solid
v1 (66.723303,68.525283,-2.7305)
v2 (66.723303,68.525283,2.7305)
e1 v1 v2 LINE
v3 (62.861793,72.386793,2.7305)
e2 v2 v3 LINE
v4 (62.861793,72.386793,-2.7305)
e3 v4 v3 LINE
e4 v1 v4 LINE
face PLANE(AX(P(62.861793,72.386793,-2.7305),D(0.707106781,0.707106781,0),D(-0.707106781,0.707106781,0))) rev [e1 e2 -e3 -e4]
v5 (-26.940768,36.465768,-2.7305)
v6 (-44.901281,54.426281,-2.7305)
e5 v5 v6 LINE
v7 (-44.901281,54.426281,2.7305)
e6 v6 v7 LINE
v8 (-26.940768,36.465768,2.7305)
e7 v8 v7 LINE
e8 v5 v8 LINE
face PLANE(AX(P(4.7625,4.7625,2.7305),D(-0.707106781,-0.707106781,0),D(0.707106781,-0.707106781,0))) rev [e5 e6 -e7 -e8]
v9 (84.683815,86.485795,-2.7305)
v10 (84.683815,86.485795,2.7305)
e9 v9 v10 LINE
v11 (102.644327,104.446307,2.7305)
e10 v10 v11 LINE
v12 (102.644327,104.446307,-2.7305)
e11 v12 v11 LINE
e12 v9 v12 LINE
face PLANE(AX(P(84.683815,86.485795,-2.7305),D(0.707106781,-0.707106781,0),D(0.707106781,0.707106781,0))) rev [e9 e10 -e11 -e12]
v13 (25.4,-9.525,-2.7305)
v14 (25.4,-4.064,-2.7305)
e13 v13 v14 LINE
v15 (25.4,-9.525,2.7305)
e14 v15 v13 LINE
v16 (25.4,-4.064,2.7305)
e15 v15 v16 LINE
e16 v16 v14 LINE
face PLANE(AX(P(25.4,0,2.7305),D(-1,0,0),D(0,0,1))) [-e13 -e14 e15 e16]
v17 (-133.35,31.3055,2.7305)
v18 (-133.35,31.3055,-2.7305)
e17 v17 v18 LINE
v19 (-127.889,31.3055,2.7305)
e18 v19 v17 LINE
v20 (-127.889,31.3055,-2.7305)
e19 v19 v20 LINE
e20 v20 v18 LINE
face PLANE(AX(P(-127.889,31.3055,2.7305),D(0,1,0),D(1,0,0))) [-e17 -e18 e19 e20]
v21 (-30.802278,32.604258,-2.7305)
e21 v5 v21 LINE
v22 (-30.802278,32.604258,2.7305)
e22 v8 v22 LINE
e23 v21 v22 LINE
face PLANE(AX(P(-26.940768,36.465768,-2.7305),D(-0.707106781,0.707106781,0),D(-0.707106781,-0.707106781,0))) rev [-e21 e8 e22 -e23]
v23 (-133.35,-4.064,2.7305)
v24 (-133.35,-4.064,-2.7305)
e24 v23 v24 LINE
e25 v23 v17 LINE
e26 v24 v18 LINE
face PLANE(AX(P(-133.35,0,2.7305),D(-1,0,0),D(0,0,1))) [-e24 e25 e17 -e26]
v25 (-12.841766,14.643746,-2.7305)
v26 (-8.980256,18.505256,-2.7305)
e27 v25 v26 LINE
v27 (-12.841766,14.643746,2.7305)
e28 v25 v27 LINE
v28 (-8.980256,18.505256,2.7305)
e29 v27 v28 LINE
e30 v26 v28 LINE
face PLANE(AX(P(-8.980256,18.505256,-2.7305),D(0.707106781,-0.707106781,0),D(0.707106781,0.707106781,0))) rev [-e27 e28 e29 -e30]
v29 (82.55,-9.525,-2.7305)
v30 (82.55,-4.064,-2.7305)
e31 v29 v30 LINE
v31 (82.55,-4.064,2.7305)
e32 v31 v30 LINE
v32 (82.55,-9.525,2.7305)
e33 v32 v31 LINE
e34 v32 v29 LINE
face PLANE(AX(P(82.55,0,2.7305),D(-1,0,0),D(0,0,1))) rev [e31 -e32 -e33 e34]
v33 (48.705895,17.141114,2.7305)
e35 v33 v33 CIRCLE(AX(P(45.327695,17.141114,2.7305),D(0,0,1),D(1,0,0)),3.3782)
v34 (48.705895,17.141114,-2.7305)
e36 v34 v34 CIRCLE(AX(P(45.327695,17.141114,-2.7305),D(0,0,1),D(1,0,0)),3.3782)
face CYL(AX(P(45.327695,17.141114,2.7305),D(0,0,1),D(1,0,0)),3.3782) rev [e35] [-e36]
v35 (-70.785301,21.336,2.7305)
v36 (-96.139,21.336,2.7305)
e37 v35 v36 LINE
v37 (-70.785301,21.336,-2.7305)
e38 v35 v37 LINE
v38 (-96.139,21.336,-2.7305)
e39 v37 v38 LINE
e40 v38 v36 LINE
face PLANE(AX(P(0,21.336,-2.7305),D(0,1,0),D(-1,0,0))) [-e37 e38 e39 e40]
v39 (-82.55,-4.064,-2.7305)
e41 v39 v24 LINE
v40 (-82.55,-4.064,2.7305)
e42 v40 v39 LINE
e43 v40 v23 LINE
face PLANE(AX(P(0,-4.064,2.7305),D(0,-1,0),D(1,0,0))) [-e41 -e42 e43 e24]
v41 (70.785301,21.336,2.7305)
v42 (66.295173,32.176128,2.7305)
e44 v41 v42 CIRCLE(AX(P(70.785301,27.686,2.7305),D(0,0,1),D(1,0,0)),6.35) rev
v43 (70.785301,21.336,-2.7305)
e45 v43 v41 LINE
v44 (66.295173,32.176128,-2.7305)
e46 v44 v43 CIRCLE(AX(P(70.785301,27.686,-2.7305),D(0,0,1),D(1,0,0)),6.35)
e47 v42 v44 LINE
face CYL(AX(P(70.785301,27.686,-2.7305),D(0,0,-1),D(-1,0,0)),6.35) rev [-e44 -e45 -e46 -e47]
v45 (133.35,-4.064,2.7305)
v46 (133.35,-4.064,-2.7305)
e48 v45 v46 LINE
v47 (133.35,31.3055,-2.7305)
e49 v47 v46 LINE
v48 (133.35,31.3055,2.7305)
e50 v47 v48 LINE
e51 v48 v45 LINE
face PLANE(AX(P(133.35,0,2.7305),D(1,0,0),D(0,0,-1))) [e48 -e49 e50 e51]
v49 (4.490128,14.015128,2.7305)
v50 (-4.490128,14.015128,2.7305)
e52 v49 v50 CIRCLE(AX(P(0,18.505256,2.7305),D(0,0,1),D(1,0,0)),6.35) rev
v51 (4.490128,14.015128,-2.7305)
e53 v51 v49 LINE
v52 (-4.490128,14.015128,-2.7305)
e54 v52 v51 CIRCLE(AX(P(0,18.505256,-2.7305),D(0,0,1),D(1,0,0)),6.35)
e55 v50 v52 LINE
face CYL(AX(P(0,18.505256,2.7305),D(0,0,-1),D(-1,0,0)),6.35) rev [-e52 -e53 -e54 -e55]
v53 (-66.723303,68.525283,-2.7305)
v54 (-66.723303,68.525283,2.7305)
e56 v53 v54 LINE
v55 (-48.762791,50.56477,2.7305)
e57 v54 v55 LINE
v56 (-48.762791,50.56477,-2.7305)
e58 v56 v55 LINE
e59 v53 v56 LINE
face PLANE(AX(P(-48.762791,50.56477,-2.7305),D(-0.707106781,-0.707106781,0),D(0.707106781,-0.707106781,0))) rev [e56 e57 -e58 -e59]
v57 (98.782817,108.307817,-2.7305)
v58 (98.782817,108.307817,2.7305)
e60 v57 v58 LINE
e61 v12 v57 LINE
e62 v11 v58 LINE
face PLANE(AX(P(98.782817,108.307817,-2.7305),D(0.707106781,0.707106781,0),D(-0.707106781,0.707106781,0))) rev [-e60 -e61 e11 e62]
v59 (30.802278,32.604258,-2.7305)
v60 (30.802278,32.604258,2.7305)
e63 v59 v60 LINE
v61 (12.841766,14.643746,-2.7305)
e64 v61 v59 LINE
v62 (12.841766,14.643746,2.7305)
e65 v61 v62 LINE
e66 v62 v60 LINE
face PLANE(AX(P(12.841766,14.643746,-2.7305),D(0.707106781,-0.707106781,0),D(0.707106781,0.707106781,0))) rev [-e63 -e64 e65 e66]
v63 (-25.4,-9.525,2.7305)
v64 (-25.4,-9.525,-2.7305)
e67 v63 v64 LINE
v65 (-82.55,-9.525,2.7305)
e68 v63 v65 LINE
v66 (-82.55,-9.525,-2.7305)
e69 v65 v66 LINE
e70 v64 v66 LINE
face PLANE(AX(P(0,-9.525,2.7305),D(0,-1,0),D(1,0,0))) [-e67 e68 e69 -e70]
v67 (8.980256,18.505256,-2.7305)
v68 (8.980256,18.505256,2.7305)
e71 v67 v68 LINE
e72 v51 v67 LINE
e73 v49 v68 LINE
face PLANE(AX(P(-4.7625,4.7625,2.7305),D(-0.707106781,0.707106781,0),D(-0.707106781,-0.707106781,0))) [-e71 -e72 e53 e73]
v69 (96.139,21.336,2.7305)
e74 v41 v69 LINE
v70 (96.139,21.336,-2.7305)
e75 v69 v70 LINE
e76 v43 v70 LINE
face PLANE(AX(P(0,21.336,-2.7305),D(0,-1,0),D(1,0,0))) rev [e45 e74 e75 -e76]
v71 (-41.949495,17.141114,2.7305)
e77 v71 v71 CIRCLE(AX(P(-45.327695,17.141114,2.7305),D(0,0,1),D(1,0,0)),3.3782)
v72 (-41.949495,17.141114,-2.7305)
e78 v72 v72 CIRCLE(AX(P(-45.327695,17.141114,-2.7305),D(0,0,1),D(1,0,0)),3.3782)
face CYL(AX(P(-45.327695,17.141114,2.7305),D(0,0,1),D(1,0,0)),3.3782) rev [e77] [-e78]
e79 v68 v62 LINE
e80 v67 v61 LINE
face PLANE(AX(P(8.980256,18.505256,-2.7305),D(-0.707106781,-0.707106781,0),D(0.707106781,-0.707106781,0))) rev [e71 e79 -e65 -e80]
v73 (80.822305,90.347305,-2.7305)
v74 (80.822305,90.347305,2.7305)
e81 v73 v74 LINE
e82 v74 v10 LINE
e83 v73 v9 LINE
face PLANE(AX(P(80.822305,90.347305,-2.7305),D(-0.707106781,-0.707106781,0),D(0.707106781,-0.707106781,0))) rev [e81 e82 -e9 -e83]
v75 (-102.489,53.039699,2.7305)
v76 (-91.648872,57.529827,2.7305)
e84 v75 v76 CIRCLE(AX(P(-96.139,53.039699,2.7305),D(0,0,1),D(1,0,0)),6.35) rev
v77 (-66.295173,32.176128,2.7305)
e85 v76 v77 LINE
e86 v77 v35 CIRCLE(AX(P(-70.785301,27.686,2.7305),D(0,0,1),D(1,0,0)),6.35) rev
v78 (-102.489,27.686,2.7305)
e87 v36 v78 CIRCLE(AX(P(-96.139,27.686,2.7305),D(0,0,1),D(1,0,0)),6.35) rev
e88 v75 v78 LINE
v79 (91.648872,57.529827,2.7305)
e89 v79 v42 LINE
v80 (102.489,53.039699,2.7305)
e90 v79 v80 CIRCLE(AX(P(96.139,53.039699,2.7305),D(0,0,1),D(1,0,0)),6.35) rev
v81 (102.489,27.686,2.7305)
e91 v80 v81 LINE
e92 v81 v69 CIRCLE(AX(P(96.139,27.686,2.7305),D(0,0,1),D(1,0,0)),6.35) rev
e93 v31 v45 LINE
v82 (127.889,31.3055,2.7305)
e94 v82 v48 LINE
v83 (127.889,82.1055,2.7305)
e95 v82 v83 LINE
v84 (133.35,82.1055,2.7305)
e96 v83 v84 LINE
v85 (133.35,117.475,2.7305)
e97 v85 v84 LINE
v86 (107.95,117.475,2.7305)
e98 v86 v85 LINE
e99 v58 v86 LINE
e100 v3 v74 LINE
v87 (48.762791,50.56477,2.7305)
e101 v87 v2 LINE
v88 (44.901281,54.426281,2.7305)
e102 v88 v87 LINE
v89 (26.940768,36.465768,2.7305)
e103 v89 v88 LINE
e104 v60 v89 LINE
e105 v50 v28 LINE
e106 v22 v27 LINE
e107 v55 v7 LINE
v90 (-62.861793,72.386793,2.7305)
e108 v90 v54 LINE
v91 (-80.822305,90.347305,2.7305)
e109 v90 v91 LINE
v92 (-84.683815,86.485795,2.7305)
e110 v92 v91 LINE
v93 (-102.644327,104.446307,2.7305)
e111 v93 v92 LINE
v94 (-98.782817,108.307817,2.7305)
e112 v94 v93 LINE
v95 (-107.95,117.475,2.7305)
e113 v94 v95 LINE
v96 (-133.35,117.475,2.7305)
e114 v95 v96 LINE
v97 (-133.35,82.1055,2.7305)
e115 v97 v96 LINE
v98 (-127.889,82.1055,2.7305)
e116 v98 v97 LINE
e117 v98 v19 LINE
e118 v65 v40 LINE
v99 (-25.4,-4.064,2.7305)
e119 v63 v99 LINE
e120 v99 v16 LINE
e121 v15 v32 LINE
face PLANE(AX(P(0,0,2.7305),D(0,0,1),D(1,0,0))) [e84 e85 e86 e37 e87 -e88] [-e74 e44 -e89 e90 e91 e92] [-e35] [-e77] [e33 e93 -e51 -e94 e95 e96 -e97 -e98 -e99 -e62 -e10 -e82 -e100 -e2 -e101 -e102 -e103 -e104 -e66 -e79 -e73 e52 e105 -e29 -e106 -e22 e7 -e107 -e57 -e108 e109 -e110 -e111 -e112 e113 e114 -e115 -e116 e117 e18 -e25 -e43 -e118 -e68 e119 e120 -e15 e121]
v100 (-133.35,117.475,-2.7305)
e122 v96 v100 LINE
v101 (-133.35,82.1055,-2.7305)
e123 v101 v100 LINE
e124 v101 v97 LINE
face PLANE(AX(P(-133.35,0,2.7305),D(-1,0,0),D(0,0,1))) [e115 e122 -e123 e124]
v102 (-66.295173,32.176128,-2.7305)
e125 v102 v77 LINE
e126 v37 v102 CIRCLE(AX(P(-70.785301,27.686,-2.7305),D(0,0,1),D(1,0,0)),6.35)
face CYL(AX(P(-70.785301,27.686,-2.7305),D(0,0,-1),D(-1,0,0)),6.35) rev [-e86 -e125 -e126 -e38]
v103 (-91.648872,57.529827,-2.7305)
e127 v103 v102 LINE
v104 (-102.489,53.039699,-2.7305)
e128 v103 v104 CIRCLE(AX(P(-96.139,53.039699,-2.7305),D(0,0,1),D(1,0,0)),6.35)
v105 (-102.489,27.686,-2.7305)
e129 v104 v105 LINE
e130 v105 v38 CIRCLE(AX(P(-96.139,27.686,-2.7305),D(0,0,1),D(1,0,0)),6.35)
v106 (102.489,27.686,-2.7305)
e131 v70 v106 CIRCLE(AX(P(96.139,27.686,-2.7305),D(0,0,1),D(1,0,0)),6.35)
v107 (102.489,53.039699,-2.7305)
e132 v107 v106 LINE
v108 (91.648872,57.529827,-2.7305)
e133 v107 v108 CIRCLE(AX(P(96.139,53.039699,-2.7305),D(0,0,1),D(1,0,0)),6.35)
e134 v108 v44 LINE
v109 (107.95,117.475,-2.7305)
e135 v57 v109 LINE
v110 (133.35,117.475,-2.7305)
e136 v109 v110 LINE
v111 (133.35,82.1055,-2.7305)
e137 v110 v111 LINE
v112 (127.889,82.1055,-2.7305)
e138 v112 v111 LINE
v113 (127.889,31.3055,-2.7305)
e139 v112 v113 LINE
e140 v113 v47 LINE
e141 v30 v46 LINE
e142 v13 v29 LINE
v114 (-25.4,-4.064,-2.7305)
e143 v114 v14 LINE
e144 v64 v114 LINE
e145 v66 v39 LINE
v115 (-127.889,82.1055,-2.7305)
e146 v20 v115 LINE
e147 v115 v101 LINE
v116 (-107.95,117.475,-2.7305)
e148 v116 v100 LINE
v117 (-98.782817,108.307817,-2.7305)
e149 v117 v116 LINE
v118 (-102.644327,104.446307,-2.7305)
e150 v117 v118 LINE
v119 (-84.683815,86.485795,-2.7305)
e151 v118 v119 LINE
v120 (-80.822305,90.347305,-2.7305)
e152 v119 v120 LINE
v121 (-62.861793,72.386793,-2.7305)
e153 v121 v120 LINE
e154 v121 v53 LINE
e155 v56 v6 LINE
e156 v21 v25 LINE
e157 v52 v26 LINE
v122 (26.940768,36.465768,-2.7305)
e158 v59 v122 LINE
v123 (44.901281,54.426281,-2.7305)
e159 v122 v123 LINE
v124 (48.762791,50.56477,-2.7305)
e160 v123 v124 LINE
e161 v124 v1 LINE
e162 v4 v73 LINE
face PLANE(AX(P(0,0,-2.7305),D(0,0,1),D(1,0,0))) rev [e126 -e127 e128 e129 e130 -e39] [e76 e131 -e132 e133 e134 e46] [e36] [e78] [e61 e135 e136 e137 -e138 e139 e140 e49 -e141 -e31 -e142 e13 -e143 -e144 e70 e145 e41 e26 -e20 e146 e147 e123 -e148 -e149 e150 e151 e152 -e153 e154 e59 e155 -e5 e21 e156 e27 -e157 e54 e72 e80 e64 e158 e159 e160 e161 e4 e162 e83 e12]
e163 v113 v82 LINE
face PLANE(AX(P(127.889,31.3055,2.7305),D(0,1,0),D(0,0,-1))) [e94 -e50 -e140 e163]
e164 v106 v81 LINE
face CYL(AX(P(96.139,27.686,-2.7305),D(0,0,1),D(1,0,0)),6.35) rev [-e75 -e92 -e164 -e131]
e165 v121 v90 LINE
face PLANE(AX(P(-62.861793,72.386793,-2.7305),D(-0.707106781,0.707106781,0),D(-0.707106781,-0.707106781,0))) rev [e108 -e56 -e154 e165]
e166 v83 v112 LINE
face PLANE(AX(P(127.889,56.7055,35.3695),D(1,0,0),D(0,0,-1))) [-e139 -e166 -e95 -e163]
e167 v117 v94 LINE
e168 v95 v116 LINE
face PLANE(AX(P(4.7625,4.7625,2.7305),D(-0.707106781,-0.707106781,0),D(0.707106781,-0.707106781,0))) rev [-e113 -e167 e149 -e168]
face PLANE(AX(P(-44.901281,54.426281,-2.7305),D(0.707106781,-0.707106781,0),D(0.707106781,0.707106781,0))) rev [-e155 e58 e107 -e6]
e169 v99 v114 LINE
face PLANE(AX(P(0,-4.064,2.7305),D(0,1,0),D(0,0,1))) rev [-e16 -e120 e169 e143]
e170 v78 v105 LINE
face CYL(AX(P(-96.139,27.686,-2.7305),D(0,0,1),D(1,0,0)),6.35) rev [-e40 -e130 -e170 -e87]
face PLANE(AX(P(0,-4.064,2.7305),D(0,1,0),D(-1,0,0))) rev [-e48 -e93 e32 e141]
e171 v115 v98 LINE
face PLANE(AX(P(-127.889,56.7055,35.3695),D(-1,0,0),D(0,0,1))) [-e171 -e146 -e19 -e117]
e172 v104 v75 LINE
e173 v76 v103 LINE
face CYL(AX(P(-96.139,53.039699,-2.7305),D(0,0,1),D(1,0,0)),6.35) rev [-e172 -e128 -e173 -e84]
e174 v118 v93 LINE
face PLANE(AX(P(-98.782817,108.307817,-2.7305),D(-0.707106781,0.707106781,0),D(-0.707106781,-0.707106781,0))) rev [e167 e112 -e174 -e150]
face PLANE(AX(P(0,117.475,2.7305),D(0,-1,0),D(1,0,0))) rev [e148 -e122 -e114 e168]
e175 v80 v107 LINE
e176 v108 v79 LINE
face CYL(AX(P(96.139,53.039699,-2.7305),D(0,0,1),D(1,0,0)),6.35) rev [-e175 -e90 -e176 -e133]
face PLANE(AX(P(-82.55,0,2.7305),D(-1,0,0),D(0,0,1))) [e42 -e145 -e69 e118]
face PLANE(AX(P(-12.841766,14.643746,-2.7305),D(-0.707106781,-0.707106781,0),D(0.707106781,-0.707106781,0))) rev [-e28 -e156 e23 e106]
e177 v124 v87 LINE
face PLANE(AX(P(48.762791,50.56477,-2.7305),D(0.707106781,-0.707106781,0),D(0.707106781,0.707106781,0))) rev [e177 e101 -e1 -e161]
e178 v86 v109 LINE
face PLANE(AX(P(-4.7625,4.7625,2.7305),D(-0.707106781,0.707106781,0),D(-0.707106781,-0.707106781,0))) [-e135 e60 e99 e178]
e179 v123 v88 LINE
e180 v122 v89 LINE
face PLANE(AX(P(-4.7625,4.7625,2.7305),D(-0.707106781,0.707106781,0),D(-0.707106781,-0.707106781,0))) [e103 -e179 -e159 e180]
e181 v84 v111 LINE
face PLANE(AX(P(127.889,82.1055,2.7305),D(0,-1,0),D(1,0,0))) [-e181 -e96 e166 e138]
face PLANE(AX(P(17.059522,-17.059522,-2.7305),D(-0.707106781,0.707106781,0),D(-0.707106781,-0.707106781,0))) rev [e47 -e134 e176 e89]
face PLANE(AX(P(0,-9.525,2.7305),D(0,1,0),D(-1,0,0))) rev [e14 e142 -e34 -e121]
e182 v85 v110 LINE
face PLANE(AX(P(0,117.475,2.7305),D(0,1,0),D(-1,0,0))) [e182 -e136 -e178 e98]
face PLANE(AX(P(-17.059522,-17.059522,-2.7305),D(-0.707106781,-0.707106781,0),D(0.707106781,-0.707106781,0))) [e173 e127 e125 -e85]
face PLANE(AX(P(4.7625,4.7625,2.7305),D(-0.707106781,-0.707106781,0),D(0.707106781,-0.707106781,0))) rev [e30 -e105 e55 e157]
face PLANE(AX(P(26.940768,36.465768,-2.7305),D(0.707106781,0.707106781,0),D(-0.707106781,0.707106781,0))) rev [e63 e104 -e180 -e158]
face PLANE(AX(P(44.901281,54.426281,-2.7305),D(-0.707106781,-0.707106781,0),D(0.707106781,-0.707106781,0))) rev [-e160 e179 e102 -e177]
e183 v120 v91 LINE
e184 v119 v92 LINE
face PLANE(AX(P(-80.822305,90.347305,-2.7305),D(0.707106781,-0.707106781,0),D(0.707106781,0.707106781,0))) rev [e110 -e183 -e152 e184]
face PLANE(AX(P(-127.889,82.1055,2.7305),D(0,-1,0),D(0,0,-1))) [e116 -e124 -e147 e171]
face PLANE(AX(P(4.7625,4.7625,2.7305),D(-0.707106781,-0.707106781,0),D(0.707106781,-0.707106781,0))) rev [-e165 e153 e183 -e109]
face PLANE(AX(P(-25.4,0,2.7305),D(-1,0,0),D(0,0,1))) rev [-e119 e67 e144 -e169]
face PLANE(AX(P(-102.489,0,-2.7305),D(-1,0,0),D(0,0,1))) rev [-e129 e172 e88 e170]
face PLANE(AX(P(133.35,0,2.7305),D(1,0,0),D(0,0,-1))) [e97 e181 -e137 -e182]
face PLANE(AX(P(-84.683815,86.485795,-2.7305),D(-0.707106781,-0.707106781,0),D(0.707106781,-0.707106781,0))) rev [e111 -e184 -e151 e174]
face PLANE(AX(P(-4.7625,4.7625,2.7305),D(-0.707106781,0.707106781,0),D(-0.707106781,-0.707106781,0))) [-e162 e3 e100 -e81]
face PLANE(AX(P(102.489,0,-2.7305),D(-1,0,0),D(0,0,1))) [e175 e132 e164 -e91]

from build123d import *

# Parameters (mm, degrees)
BOSS_EXTRUDE1_DEPTH     = 2.7305
CUT_EXTRUDE1_DEPTH      = 178.79882071
CAVITY1_START           = -133.35
CAVITY1_OUTLINE_W       = 50.8
CAVITY1_OUTLINE_H       = 5.461
CAVITY1_DEPTH           = 5.461
CAVITY1_START_2         = 127.889
CAVITY1_2_OUTLINE_W     = 50.8
CAVITY1_2_OUTLINE_H     = 5.461
CAVITY1_2_DEPTH         = 5.461
FILLET1_R               = 6.35
SKETCH3_W               = 5.461
SKETCH3_H               = 50.8
CUT_EXTRUDE2_DEPTH      = 178.79882071
FILLET2_R               = 6.35
F_1_4_CLEARANCE_HOLE1_D = 6.7564


# Read off the part's stored shape, not the designer's step: Cavity1
with BuildPart() as part:
    # Sketch1 → Boss-Extrude1 (new, symmetric)
    with BuildSketch(Plane.XY):
        Polygon((133.35, -4.064), (133.35, 117.475), (107.95, 117.475), (0, 9.525), (-107.95, 117.475), (-133.35, 117.475), (-133.35, -4.064), (-82.55, -4.064), (-82.55, -9.525), (-25.4, -9.525), (-25.4, -4.064), (25.4, -4.064), (25.4, -9.525), (82.55, -9.525), (82.55, -4.064), align=None)
    extrude(amount=BOSS_EXTRUDE1_DEPTH, both=True)

    # Sketch2 → Cut-Extrude1 (cut, through all)
    with BuildSketch(Plane.XY.offset(2.7305)):
        Polygon((-8.980256121, 18.505256121), (-12.841766253, 14.643745989), (-30.802278495, 32.604258231), (-26.940768363, 36.465768363), align=None)
        Polygon((-62.861792847, 72.386792847), (-66.72330298, 68.525282715), (-48.762790737, 50.564770473), (-44.901280605, 54.426280605), align=None)
        Polygon((-98.782817332, 108.307817332), (-102.644327464, 104.4463072), (-84.683815222, 86.485794958), (-80.82230509, 90.34730509), align=None)
        Polygon((80.82230509, 90.34730509), (98.782817332, 108.307817332), (102.644327464, 104.4463072), (84.683815222, 86.485794958), align=None)
        Polygon((44.901280605, 54.426280605), (62.861792847, 72.386792847), (66.72330298, 68.525282715), (48.762790737, 50.564770473), align=None)
        Polygon((26.940768363, 36.465768363), (30.802278495, 32.604258231), (12.841766253, 14.643745989), (8.980256121, 18.505256121), align=None)
    extrude(amount=-CUT_EXTRUDE1_DEPTH, mode=Mode.SUBTRACT)

    # Cavity1 outline → Cavity1 (cut)
    with BuildSketch(Plane.YZ.offset(CAVITY1_START)):
        with Locations((56.7055, 0)):
            Rectangle(CAVITY1_OUTLINE_W, CAVITY1_OUTLINE_H)
    extrude(amount=CAVITY1_DEPTH, mode=Mode.SUBTRACT)

    # Cavity1 2 outline → Cavity1 2 (cut)
    with BuildSketch(Plane.YZ.offset(CAVITY1_START_2)):
        with Locations((56.7055, 0)):
            Rectangle(CAVITY1_2_OUTLINE_W, CAVITY1_2_OUTLINE_H)
    extrude(amount=CAVITY1_2_DEPTH, mode=Mode.SUBTRACT)

    # Fillet1
    fillet1_edges = [part.edges().sort_by_distance(p)[0] for p in [
        (0, 9.525, 0),
    ]]
    fillet(fillet1_edges, radius=FILLET1_R)

    # Sketch3 → Cut-Extrude2 (cut, through all)
    with BuildSketch(Plane.XY.offset(2.7305)):
        with Locations((-130.6195, 56.7055)):
            Rectangle(SKETCH3_W, SKETCH3_H)
        Polygon((-102.489, 68.369955252), (-55.455044748, 21.336), (-102.489, 21.336), (-102.489, 31.3055), align=None)
    cut_extrude2 = extrude(amount=-CUT_EXTRUDE2_DEPTH, mode=Mode.SUBTRACT)

    # Mirror1: Cut-Extrude2 across plane
    add(cut_extrude2.mirror(Plane(origin=(0, 0, 0), x_dir=(0, 0, 1), z_dir=(1, 0, 0))), mode=Mode.SUBTRACT)

    # Fillet2
    fillet2_edges = [part.edges().sort_by_distance(p)[0] for p in [
        (-55.455044748, 21.336, 0),
        (-102.489, 21.336, 0),
        (-102.489, 68.369955252, 0),
        (102.489, 21.336, 0),
        (55.455044748, 21.336, 0),
        (102.489, 68.369955252, 0),
    ]]
    fillet(fillet2_edges, radius=FILLET2_R)

    # 1/4 Clearance Hole1 (through all)
    with Locations(Plane.XY.offset(2.7305)):
        with Locations((-45.327694765, 17.141114286)):
            f_1_4_clearance_hole1 = Hole(F_1_4_CLEARANCE_HOLE1_D / 2)

    # Mirror2: 1/4 Clearance Hole1 across plane
    add(f_1_4_clearance_hole1.mirror(Plane(origin=(0, 0, 0), x_dir=(0, 0, 1), z_dir=(1, 0, 0))), mode=Mode.SUBTRACT)


solid = part.part
